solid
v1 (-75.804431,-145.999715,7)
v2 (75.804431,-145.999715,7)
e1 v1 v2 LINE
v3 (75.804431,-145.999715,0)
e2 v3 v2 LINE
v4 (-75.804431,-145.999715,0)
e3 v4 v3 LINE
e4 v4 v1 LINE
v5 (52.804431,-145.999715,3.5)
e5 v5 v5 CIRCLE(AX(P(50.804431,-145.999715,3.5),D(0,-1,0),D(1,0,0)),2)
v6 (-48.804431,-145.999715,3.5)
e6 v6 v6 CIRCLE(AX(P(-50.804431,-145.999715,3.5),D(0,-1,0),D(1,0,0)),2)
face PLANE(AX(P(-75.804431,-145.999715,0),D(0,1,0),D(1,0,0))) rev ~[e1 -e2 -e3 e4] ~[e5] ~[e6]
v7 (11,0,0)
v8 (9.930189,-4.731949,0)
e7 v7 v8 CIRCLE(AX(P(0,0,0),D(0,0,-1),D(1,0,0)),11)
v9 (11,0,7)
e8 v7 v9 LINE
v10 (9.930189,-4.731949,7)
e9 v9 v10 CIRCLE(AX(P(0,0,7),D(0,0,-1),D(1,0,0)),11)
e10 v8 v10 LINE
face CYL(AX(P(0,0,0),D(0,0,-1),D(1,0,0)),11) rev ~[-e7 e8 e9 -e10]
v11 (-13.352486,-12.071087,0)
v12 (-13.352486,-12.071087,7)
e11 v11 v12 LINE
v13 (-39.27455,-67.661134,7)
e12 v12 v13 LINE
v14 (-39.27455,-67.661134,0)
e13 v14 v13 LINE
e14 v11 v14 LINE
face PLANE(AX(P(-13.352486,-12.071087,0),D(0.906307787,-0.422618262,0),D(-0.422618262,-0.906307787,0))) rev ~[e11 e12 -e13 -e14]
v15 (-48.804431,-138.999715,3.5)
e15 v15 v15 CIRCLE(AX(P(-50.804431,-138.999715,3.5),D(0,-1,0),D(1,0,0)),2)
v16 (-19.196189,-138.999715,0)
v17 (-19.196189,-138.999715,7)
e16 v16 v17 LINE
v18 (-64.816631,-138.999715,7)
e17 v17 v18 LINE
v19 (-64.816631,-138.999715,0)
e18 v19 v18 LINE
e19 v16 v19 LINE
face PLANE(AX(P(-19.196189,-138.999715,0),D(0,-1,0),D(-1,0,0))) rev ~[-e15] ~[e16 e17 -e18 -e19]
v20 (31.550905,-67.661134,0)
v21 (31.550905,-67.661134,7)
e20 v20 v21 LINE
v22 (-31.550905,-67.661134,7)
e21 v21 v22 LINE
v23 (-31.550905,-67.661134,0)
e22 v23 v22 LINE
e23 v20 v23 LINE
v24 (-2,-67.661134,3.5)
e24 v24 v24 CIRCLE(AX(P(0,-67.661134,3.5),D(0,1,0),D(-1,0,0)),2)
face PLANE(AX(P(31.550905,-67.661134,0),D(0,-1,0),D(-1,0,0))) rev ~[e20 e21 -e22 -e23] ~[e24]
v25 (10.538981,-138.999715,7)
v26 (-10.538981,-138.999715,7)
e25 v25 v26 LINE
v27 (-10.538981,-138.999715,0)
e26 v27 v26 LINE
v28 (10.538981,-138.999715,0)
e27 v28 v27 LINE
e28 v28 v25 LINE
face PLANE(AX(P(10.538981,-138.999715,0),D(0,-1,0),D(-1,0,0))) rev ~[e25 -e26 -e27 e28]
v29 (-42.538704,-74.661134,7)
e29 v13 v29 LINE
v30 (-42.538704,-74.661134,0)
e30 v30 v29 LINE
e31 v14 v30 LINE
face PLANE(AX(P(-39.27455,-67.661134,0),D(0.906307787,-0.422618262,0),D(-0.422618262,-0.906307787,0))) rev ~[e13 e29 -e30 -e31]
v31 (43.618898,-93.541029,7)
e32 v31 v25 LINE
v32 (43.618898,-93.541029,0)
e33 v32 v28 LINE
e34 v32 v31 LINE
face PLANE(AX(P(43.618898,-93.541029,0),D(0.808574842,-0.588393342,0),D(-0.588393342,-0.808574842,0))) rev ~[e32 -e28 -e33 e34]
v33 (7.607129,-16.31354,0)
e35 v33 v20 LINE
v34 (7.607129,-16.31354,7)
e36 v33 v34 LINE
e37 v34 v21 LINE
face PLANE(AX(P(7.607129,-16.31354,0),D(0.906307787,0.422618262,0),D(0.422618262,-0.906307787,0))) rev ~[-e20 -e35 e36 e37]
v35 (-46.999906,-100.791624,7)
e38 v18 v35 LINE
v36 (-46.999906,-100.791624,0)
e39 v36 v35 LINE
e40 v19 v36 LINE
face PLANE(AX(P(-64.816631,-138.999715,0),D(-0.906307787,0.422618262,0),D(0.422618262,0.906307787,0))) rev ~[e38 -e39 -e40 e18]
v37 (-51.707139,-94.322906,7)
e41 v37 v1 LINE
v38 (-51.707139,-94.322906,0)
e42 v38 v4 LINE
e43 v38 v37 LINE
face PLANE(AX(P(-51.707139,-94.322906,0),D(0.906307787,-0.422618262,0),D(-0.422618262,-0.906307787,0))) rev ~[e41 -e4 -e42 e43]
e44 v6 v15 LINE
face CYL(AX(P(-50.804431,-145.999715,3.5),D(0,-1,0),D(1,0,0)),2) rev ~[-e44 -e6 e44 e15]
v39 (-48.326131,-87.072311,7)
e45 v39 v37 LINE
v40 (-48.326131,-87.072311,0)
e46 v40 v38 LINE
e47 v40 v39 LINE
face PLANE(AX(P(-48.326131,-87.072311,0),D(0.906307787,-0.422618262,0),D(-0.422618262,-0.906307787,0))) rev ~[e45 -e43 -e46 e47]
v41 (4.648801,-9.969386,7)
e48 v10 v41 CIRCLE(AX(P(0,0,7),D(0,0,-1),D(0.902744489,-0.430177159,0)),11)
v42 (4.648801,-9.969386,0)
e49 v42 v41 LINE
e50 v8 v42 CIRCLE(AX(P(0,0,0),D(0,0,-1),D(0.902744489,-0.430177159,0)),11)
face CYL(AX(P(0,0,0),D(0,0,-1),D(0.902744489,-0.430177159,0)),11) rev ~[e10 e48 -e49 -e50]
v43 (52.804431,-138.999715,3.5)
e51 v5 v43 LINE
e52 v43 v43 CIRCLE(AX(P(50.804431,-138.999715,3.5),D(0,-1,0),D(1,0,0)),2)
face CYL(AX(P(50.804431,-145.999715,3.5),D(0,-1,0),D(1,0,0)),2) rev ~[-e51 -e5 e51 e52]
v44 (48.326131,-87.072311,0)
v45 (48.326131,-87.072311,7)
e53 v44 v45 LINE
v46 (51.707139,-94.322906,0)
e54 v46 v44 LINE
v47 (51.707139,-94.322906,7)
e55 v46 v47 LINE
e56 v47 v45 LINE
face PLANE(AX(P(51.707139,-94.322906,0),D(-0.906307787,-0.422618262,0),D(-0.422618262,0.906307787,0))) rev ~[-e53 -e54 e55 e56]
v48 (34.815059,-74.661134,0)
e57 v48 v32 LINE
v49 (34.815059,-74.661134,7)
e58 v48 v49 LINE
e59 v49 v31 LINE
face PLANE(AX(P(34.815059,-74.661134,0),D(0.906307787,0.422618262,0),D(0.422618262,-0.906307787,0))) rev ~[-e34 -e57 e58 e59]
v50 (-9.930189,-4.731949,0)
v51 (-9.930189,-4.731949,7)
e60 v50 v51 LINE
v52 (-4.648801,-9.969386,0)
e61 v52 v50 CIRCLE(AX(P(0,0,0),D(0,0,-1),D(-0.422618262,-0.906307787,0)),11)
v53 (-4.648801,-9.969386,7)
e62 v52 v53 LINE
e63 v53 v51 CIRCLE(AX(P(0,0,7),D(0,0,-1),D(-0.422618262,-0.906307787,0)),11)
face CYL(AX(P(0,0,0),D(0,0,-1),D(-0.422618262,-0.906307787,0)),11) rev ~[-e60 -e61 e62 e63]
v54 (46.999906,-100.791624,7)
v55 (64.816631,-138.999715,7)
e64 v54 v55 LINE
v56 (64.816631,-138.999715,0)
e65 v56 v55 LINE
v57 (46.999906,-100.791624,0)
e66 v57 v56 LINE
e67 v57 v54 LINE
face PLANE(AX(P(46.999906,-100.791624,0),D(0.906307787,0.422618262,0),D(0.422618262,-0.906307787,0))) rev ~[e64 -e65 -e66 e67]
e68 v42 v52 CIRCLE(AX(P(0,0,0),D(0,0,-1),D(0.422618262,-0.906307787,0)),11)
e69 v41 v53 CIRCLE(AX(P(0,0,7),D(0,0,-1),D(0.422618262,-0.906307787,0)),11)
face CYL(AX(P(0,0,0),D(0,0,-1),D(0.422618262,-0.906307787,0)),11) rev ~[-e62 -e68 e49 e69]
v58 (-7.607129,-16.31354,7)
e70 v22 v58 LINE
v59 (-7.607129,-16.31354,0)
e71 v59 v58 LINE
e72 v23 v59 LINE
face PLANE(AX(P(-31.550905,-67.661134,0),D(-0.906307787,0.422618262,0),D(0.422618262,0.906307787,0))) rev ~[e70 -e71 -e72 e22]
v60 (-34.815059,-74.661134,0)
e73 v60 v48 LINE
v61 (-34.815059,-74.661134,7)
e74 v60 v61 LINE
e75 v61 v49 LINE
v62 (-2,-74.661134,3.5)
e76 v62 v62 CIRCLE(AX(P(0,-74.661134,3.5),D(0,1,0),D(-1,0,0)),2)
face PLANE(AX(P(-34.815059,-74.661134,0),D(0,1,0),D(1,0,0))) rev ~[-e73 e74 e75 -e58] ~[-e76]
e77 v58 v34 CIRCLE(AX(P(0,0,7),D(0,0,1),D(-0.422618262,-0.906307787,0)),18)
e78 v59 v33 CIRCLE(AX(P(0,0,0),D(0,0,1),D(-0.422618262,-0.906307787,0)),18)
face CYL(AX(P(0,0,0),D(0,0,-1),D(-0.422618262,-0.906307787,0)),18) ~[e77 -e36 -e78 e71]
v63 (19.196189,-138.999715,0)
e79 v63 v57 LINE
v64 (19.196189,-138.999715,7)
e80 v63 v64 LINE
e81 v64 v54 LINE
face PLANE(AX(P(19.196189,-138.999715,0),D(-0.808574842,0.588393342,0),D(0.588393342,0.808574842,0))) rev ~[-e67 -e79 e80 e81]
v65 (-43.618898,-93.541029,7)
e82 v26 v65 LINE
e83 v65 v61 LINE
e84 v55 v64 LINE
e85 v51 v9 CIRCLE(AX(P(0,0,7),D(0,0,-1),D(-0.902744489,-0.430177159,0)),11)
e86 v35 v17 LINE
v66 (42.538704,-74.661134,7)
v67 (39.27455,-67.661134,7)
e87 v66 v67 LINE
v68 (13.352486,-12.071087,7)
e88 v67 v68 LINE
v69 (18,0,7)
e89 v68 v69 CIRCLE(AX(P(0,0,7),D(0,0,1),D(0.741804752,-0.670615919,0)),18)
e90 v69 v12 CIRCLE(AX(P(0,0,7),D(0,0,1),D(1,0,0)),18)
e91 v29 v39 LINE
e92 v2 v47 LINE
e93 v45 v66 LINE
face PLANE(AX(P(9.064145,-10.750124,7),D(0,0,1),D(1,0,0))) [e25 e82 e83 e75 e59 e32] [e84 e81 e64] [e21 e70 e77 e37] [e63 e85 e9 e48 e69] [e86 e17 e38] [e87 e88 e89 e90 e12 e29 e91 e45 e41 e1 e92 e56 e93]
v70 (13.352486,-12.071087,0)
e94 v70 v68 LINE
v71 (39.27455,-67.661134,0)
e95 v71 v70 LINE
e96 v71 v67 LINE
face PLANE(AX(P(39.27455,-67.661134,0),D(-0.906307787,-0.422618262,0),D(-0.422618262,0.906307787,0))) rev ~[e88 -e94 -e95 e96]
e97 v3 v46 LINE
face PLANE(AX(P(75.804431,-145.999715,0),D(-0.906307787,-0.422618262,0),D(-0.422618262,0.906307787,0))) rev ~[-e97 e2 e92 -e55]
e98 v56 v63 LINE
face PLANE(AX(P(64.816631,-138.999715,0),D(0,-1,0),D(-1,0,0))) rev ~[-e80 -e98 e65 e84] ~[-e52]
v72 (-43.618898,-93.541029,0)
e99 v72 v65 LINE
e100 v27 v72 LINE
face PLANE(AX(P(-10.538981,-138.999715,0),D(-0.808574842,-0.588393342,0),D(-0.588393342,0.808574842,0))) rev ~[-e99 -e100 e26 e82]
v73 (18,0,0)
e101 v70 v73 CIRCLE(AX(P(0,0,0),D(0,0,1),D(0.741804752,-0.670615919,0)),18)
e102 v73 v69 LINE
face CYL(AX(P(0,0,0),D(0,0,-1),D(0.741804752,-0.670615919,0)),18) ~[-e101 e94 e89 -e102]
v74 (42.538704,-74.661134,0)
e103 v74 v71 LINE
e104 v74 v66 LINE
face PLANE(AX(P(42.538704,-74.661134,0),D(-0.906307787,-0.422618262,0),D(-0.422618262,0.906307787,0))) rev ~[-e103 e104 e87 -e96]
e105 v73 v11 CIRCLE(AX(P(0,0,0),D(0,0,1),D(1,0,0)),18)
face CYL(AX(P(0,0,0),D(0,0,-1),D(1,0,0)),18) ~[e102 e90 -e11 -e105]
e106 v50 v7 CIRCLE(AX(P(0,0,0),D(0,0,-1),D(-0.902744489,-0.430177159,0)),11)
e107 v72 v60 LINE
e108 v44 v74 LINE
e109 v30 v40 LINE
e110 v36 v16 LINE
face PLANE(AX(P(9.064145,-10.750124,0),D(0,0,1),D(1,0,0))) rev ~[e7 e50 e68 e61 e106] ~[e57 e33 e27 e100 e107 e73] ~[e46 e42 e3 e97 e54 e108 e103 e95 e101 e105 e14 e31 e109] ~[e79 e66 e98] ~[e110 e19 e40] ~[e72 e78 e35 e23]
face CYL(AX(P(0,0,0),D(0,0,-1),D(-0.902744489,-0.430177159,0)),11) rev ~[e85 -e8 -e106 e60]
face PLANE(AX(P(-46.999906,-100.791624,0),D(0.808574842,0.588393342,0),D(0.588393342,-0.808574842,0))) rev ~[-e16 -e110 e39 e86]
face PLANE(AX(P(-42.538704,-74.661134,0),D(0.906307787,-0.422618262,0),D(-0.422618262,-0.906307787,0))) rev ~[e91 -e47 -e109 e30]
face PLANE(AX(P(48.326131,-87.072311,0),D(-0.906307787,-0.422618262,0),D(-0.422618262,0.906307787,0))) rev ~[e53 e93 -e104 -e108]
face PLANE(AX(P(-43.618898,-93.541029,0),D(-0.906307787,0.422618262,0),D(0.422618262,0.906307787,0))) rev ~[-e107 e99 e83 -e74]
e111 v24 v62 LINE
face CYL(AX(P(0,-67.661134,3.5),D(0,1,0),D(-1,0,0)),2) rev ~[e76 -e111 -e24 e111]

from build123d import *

# Parameters (mm, degrees)
F1_DEPTH = 7
F2_R     = 2
F3_DEPTH = 8
F4_R     = 2
F5_DEPTH = 8


# Not quite as in the source:
# - a feature names something its author has since deleted; it is built from what else it names


with BuildPart() as f1:
    # F0 (on Top) → F1 (new body)
    with BuildSketch(Plane.XY):
        with BuildLine():
            ThreePointArc((9.930189374, -4.7319487525), (7.7456068538, -7.8106065364), (4.6488008791, -9.9693856574))
            Line((4.6488008791, -9.9693856574), (7.6071287113, -16.3135401667))
            ThreePointArc((7.6071287113, -16.3135401667), (10.6923318533, -14.4801256741), (13.352485528, -12.0710865387))
            Line((13.352485528, -12.0710865387), (9.930189374, -4.7319487525))
        make_face()
        with BuildLine():
            Line((7.6071287113, -16.3135401667), (4.6488008791, -9.9693856574))
            ThreePointArc((4.6488008791, -9.9693856574), (0, -11), (-4.6488008791, -9.9693856574))
            Line((-4.6488008791, -9.9693856574), (-7.6071287113, -16.3135401667))
            ThreePointArc((-7.6071287113, -16.3135401667), (0, -18), (7.6071287113, -16.3135401667))
        make_face()
        with BuildLine():
            Line((-7.6071287113, -16.3135401667), (-4.6488008791, -9.9693856574))
            ThreePointArc((-4.6488008791, -9.9693856574), (-7.7456068538, -7.8106065364), (-9.930189374, -4.7319487525))
            Line((-9.930189374, -4.7319487525), (-13.352485528, -12.0710865387))
            ThreePointArc((-13.352485528, -12.0710865387), (-10.6923318533, -14.4801256741), (-7.6071287113, -16.3135401667))
        make_face()
        with BuildLine():
            ThreePointArc((13.352485528, -12.0710865387), (10.6923318533, -14.4801256741), (7.6071287113, -16.3135401667))
            Line((7.6071287113, -16.3135401667), (31.5509050579, -67.6611342449))
            Line((31.5509050579, -67.6611342449), (39.2745504906, -67.6611342449))
            Line((39.2745504906, -67.6611342449), (13.352485528, -12.0710865387))
        make_face()
        with BuildLine():
            ThreePointArc((11, 0), (10.7292143961, -2.4256872104), (9.930189374, -4.7319487525))
            Line((9.930189374, -4.7319487525), (13.352485528, -12.0710865387))
            ThreePointArc((13.352485528, -12.0710865387), (16.7979870744, -6.4674284107), (18, 0))
            ThreePointArc((18, 0), (-6.4674284107, 16.7979870744), (-13.352485528, -12.0710865387))
            Line((-13.352485528, -12.0710865387), (-9.930189374, -4.7319487525))
            ThreePointArc((-9.930189374, -4.7319487525), (-2.4256872104, 10.7292143961), (11, 0))
        make_face()
        with BuildLine():
            Line((-31.5509050579, -67.6611342449), (-7.6071287113, -16.3135401667))
            ThreePointArc((-7.6071287113, -16.3135401667), (-10.6923318533, -14.4801256741), (-13.352485528, -12.0710865387))
            Line((-13.352485528, -12.0710865387), (-39.2745504906, -67.6611342449))
            Line((-39.2745504906, -67.6611342449), (-31.5509050579, -67.6611342449))
        make_face()
        Polygon((39.2745504906, -67.6611342449), (31.5509050579, -67.6611342449), (34.8150586649, -74.6611342449), (42.5387040977, -74.6611342449), align=None)
        Polygon((34.8150586649, -74.6611342449), (31.5509050579, -67.6611342449), (-31.5509050579, -67.6611342449), (-34.8150586649, -74.6611342449), align=None)
        Polygon((-34.8150586649, -74.6611342449), (-31.5509050579, -67.6611342449), (-39.2745504906, -67.6611342449), (-42.5387040977, -74.6611342449), align=None)
        Polygon((42.5387040977, -74.6611342449), (34.8150586649, -74.6611342449), (43.6188979632, -93.5410285471), (48.3261309802, -87.0723112465), align=None)
        Polygon((-43.6188979632, -93.5410285471), (-34.8150586649, -74.6611342449), (-42.5387040977, -74.6611342449), (-48.3261309802, -87.0723112465), align=None)
        Polygon((48.3261309802, -87.0723112465), (43.6188979632, -93.5410285471), (46.9999060281, -100.7916237405), (51.7071390451, -94.3229064398), align=None)
        Polygon((46.9999060281, -100.7916237405), (43.6188979632, -93.5410285471), (10.5389814088, -138.9997147322), (19.1961886798, -138.9997147322), align=None)
        Polygon((-10.5389814088, -138.9997147322), (-43.6188979632, -93.5410285471), (-46.9999060281, -100.7916237405), (-19.1961886798, -138.9997147322), align=None)
        Polygon((-46.9999060281, -100.7916237405), (-43.6188979632, -93.5410285471), (-48.3261309802, -87.0723112465), (-51.7071390451, -94.3229064398), align=None)
        Polygon((51.7071390451, -94.3229064398), (46.9999060281, -100.7916237405), (64.816631461, -138.9997147322), (19.1961886798, -138.9997147322), (14.1023455596, -145.9997147322), (75.8044305008, -145.9997147322), align=None)
        Polygon((19.1961886798, -138.9997147322), (10.5389814088, -138.9997147322), (5.4451382885, -145.9997147322), (14.1023455596, -145.9997147322), align=None)
        Polygon((5.4451382885, -145.9997147322), (10.5389814088, -138.9997147322), (-10.5389814088, -138.9997147322), (-5.4451382885, -145.9997147322), align=None)
        Polygon((-64.816631461, -138.9997147322), (-46.9999060281, -100.7916237405), (-51.7071390451, -94.3229064398), (-75.8044305008, -145.9997147322), (-14.1023455596, -145.9997147322), (-19.1961886798, -138.9997147322), align=None)
        Polygon((-5.4451382885, -145.9997147322), (-10.5389814088, -138.9997147322), (-19.1961886798, -138.9997147322), (-14.1023455596, -145.9997147322), align=None)
    extrude(amount=F1_DEPTH)

    # F2 (on face) → F3 (cut)
    with BuildSketch(Plane(origin=(0, -67.6611342449, 0), x_dir=(-1, 0, 0), z_dir=(0, 1, 0))):
        with Locations((0, 3.5)):
            Circle(F2_R)
    extrude(amount=-F3_DEPTH, mode=Mode.SUBTRACT)

    # F4 (on face) → F5 (cut)
    with BuildSketch(Plane.XZ.offset(145.9997147322)):
        with Locations((-50.8044305008, 3.5)):
            Circle(F4_R)
        with Locations((50.8044305008, 3.5)):
            Circle(F4_R)
    extrude(amount=-F5_DEPTH, mode=Mode.SUBTRACT)


solid = f1.part
